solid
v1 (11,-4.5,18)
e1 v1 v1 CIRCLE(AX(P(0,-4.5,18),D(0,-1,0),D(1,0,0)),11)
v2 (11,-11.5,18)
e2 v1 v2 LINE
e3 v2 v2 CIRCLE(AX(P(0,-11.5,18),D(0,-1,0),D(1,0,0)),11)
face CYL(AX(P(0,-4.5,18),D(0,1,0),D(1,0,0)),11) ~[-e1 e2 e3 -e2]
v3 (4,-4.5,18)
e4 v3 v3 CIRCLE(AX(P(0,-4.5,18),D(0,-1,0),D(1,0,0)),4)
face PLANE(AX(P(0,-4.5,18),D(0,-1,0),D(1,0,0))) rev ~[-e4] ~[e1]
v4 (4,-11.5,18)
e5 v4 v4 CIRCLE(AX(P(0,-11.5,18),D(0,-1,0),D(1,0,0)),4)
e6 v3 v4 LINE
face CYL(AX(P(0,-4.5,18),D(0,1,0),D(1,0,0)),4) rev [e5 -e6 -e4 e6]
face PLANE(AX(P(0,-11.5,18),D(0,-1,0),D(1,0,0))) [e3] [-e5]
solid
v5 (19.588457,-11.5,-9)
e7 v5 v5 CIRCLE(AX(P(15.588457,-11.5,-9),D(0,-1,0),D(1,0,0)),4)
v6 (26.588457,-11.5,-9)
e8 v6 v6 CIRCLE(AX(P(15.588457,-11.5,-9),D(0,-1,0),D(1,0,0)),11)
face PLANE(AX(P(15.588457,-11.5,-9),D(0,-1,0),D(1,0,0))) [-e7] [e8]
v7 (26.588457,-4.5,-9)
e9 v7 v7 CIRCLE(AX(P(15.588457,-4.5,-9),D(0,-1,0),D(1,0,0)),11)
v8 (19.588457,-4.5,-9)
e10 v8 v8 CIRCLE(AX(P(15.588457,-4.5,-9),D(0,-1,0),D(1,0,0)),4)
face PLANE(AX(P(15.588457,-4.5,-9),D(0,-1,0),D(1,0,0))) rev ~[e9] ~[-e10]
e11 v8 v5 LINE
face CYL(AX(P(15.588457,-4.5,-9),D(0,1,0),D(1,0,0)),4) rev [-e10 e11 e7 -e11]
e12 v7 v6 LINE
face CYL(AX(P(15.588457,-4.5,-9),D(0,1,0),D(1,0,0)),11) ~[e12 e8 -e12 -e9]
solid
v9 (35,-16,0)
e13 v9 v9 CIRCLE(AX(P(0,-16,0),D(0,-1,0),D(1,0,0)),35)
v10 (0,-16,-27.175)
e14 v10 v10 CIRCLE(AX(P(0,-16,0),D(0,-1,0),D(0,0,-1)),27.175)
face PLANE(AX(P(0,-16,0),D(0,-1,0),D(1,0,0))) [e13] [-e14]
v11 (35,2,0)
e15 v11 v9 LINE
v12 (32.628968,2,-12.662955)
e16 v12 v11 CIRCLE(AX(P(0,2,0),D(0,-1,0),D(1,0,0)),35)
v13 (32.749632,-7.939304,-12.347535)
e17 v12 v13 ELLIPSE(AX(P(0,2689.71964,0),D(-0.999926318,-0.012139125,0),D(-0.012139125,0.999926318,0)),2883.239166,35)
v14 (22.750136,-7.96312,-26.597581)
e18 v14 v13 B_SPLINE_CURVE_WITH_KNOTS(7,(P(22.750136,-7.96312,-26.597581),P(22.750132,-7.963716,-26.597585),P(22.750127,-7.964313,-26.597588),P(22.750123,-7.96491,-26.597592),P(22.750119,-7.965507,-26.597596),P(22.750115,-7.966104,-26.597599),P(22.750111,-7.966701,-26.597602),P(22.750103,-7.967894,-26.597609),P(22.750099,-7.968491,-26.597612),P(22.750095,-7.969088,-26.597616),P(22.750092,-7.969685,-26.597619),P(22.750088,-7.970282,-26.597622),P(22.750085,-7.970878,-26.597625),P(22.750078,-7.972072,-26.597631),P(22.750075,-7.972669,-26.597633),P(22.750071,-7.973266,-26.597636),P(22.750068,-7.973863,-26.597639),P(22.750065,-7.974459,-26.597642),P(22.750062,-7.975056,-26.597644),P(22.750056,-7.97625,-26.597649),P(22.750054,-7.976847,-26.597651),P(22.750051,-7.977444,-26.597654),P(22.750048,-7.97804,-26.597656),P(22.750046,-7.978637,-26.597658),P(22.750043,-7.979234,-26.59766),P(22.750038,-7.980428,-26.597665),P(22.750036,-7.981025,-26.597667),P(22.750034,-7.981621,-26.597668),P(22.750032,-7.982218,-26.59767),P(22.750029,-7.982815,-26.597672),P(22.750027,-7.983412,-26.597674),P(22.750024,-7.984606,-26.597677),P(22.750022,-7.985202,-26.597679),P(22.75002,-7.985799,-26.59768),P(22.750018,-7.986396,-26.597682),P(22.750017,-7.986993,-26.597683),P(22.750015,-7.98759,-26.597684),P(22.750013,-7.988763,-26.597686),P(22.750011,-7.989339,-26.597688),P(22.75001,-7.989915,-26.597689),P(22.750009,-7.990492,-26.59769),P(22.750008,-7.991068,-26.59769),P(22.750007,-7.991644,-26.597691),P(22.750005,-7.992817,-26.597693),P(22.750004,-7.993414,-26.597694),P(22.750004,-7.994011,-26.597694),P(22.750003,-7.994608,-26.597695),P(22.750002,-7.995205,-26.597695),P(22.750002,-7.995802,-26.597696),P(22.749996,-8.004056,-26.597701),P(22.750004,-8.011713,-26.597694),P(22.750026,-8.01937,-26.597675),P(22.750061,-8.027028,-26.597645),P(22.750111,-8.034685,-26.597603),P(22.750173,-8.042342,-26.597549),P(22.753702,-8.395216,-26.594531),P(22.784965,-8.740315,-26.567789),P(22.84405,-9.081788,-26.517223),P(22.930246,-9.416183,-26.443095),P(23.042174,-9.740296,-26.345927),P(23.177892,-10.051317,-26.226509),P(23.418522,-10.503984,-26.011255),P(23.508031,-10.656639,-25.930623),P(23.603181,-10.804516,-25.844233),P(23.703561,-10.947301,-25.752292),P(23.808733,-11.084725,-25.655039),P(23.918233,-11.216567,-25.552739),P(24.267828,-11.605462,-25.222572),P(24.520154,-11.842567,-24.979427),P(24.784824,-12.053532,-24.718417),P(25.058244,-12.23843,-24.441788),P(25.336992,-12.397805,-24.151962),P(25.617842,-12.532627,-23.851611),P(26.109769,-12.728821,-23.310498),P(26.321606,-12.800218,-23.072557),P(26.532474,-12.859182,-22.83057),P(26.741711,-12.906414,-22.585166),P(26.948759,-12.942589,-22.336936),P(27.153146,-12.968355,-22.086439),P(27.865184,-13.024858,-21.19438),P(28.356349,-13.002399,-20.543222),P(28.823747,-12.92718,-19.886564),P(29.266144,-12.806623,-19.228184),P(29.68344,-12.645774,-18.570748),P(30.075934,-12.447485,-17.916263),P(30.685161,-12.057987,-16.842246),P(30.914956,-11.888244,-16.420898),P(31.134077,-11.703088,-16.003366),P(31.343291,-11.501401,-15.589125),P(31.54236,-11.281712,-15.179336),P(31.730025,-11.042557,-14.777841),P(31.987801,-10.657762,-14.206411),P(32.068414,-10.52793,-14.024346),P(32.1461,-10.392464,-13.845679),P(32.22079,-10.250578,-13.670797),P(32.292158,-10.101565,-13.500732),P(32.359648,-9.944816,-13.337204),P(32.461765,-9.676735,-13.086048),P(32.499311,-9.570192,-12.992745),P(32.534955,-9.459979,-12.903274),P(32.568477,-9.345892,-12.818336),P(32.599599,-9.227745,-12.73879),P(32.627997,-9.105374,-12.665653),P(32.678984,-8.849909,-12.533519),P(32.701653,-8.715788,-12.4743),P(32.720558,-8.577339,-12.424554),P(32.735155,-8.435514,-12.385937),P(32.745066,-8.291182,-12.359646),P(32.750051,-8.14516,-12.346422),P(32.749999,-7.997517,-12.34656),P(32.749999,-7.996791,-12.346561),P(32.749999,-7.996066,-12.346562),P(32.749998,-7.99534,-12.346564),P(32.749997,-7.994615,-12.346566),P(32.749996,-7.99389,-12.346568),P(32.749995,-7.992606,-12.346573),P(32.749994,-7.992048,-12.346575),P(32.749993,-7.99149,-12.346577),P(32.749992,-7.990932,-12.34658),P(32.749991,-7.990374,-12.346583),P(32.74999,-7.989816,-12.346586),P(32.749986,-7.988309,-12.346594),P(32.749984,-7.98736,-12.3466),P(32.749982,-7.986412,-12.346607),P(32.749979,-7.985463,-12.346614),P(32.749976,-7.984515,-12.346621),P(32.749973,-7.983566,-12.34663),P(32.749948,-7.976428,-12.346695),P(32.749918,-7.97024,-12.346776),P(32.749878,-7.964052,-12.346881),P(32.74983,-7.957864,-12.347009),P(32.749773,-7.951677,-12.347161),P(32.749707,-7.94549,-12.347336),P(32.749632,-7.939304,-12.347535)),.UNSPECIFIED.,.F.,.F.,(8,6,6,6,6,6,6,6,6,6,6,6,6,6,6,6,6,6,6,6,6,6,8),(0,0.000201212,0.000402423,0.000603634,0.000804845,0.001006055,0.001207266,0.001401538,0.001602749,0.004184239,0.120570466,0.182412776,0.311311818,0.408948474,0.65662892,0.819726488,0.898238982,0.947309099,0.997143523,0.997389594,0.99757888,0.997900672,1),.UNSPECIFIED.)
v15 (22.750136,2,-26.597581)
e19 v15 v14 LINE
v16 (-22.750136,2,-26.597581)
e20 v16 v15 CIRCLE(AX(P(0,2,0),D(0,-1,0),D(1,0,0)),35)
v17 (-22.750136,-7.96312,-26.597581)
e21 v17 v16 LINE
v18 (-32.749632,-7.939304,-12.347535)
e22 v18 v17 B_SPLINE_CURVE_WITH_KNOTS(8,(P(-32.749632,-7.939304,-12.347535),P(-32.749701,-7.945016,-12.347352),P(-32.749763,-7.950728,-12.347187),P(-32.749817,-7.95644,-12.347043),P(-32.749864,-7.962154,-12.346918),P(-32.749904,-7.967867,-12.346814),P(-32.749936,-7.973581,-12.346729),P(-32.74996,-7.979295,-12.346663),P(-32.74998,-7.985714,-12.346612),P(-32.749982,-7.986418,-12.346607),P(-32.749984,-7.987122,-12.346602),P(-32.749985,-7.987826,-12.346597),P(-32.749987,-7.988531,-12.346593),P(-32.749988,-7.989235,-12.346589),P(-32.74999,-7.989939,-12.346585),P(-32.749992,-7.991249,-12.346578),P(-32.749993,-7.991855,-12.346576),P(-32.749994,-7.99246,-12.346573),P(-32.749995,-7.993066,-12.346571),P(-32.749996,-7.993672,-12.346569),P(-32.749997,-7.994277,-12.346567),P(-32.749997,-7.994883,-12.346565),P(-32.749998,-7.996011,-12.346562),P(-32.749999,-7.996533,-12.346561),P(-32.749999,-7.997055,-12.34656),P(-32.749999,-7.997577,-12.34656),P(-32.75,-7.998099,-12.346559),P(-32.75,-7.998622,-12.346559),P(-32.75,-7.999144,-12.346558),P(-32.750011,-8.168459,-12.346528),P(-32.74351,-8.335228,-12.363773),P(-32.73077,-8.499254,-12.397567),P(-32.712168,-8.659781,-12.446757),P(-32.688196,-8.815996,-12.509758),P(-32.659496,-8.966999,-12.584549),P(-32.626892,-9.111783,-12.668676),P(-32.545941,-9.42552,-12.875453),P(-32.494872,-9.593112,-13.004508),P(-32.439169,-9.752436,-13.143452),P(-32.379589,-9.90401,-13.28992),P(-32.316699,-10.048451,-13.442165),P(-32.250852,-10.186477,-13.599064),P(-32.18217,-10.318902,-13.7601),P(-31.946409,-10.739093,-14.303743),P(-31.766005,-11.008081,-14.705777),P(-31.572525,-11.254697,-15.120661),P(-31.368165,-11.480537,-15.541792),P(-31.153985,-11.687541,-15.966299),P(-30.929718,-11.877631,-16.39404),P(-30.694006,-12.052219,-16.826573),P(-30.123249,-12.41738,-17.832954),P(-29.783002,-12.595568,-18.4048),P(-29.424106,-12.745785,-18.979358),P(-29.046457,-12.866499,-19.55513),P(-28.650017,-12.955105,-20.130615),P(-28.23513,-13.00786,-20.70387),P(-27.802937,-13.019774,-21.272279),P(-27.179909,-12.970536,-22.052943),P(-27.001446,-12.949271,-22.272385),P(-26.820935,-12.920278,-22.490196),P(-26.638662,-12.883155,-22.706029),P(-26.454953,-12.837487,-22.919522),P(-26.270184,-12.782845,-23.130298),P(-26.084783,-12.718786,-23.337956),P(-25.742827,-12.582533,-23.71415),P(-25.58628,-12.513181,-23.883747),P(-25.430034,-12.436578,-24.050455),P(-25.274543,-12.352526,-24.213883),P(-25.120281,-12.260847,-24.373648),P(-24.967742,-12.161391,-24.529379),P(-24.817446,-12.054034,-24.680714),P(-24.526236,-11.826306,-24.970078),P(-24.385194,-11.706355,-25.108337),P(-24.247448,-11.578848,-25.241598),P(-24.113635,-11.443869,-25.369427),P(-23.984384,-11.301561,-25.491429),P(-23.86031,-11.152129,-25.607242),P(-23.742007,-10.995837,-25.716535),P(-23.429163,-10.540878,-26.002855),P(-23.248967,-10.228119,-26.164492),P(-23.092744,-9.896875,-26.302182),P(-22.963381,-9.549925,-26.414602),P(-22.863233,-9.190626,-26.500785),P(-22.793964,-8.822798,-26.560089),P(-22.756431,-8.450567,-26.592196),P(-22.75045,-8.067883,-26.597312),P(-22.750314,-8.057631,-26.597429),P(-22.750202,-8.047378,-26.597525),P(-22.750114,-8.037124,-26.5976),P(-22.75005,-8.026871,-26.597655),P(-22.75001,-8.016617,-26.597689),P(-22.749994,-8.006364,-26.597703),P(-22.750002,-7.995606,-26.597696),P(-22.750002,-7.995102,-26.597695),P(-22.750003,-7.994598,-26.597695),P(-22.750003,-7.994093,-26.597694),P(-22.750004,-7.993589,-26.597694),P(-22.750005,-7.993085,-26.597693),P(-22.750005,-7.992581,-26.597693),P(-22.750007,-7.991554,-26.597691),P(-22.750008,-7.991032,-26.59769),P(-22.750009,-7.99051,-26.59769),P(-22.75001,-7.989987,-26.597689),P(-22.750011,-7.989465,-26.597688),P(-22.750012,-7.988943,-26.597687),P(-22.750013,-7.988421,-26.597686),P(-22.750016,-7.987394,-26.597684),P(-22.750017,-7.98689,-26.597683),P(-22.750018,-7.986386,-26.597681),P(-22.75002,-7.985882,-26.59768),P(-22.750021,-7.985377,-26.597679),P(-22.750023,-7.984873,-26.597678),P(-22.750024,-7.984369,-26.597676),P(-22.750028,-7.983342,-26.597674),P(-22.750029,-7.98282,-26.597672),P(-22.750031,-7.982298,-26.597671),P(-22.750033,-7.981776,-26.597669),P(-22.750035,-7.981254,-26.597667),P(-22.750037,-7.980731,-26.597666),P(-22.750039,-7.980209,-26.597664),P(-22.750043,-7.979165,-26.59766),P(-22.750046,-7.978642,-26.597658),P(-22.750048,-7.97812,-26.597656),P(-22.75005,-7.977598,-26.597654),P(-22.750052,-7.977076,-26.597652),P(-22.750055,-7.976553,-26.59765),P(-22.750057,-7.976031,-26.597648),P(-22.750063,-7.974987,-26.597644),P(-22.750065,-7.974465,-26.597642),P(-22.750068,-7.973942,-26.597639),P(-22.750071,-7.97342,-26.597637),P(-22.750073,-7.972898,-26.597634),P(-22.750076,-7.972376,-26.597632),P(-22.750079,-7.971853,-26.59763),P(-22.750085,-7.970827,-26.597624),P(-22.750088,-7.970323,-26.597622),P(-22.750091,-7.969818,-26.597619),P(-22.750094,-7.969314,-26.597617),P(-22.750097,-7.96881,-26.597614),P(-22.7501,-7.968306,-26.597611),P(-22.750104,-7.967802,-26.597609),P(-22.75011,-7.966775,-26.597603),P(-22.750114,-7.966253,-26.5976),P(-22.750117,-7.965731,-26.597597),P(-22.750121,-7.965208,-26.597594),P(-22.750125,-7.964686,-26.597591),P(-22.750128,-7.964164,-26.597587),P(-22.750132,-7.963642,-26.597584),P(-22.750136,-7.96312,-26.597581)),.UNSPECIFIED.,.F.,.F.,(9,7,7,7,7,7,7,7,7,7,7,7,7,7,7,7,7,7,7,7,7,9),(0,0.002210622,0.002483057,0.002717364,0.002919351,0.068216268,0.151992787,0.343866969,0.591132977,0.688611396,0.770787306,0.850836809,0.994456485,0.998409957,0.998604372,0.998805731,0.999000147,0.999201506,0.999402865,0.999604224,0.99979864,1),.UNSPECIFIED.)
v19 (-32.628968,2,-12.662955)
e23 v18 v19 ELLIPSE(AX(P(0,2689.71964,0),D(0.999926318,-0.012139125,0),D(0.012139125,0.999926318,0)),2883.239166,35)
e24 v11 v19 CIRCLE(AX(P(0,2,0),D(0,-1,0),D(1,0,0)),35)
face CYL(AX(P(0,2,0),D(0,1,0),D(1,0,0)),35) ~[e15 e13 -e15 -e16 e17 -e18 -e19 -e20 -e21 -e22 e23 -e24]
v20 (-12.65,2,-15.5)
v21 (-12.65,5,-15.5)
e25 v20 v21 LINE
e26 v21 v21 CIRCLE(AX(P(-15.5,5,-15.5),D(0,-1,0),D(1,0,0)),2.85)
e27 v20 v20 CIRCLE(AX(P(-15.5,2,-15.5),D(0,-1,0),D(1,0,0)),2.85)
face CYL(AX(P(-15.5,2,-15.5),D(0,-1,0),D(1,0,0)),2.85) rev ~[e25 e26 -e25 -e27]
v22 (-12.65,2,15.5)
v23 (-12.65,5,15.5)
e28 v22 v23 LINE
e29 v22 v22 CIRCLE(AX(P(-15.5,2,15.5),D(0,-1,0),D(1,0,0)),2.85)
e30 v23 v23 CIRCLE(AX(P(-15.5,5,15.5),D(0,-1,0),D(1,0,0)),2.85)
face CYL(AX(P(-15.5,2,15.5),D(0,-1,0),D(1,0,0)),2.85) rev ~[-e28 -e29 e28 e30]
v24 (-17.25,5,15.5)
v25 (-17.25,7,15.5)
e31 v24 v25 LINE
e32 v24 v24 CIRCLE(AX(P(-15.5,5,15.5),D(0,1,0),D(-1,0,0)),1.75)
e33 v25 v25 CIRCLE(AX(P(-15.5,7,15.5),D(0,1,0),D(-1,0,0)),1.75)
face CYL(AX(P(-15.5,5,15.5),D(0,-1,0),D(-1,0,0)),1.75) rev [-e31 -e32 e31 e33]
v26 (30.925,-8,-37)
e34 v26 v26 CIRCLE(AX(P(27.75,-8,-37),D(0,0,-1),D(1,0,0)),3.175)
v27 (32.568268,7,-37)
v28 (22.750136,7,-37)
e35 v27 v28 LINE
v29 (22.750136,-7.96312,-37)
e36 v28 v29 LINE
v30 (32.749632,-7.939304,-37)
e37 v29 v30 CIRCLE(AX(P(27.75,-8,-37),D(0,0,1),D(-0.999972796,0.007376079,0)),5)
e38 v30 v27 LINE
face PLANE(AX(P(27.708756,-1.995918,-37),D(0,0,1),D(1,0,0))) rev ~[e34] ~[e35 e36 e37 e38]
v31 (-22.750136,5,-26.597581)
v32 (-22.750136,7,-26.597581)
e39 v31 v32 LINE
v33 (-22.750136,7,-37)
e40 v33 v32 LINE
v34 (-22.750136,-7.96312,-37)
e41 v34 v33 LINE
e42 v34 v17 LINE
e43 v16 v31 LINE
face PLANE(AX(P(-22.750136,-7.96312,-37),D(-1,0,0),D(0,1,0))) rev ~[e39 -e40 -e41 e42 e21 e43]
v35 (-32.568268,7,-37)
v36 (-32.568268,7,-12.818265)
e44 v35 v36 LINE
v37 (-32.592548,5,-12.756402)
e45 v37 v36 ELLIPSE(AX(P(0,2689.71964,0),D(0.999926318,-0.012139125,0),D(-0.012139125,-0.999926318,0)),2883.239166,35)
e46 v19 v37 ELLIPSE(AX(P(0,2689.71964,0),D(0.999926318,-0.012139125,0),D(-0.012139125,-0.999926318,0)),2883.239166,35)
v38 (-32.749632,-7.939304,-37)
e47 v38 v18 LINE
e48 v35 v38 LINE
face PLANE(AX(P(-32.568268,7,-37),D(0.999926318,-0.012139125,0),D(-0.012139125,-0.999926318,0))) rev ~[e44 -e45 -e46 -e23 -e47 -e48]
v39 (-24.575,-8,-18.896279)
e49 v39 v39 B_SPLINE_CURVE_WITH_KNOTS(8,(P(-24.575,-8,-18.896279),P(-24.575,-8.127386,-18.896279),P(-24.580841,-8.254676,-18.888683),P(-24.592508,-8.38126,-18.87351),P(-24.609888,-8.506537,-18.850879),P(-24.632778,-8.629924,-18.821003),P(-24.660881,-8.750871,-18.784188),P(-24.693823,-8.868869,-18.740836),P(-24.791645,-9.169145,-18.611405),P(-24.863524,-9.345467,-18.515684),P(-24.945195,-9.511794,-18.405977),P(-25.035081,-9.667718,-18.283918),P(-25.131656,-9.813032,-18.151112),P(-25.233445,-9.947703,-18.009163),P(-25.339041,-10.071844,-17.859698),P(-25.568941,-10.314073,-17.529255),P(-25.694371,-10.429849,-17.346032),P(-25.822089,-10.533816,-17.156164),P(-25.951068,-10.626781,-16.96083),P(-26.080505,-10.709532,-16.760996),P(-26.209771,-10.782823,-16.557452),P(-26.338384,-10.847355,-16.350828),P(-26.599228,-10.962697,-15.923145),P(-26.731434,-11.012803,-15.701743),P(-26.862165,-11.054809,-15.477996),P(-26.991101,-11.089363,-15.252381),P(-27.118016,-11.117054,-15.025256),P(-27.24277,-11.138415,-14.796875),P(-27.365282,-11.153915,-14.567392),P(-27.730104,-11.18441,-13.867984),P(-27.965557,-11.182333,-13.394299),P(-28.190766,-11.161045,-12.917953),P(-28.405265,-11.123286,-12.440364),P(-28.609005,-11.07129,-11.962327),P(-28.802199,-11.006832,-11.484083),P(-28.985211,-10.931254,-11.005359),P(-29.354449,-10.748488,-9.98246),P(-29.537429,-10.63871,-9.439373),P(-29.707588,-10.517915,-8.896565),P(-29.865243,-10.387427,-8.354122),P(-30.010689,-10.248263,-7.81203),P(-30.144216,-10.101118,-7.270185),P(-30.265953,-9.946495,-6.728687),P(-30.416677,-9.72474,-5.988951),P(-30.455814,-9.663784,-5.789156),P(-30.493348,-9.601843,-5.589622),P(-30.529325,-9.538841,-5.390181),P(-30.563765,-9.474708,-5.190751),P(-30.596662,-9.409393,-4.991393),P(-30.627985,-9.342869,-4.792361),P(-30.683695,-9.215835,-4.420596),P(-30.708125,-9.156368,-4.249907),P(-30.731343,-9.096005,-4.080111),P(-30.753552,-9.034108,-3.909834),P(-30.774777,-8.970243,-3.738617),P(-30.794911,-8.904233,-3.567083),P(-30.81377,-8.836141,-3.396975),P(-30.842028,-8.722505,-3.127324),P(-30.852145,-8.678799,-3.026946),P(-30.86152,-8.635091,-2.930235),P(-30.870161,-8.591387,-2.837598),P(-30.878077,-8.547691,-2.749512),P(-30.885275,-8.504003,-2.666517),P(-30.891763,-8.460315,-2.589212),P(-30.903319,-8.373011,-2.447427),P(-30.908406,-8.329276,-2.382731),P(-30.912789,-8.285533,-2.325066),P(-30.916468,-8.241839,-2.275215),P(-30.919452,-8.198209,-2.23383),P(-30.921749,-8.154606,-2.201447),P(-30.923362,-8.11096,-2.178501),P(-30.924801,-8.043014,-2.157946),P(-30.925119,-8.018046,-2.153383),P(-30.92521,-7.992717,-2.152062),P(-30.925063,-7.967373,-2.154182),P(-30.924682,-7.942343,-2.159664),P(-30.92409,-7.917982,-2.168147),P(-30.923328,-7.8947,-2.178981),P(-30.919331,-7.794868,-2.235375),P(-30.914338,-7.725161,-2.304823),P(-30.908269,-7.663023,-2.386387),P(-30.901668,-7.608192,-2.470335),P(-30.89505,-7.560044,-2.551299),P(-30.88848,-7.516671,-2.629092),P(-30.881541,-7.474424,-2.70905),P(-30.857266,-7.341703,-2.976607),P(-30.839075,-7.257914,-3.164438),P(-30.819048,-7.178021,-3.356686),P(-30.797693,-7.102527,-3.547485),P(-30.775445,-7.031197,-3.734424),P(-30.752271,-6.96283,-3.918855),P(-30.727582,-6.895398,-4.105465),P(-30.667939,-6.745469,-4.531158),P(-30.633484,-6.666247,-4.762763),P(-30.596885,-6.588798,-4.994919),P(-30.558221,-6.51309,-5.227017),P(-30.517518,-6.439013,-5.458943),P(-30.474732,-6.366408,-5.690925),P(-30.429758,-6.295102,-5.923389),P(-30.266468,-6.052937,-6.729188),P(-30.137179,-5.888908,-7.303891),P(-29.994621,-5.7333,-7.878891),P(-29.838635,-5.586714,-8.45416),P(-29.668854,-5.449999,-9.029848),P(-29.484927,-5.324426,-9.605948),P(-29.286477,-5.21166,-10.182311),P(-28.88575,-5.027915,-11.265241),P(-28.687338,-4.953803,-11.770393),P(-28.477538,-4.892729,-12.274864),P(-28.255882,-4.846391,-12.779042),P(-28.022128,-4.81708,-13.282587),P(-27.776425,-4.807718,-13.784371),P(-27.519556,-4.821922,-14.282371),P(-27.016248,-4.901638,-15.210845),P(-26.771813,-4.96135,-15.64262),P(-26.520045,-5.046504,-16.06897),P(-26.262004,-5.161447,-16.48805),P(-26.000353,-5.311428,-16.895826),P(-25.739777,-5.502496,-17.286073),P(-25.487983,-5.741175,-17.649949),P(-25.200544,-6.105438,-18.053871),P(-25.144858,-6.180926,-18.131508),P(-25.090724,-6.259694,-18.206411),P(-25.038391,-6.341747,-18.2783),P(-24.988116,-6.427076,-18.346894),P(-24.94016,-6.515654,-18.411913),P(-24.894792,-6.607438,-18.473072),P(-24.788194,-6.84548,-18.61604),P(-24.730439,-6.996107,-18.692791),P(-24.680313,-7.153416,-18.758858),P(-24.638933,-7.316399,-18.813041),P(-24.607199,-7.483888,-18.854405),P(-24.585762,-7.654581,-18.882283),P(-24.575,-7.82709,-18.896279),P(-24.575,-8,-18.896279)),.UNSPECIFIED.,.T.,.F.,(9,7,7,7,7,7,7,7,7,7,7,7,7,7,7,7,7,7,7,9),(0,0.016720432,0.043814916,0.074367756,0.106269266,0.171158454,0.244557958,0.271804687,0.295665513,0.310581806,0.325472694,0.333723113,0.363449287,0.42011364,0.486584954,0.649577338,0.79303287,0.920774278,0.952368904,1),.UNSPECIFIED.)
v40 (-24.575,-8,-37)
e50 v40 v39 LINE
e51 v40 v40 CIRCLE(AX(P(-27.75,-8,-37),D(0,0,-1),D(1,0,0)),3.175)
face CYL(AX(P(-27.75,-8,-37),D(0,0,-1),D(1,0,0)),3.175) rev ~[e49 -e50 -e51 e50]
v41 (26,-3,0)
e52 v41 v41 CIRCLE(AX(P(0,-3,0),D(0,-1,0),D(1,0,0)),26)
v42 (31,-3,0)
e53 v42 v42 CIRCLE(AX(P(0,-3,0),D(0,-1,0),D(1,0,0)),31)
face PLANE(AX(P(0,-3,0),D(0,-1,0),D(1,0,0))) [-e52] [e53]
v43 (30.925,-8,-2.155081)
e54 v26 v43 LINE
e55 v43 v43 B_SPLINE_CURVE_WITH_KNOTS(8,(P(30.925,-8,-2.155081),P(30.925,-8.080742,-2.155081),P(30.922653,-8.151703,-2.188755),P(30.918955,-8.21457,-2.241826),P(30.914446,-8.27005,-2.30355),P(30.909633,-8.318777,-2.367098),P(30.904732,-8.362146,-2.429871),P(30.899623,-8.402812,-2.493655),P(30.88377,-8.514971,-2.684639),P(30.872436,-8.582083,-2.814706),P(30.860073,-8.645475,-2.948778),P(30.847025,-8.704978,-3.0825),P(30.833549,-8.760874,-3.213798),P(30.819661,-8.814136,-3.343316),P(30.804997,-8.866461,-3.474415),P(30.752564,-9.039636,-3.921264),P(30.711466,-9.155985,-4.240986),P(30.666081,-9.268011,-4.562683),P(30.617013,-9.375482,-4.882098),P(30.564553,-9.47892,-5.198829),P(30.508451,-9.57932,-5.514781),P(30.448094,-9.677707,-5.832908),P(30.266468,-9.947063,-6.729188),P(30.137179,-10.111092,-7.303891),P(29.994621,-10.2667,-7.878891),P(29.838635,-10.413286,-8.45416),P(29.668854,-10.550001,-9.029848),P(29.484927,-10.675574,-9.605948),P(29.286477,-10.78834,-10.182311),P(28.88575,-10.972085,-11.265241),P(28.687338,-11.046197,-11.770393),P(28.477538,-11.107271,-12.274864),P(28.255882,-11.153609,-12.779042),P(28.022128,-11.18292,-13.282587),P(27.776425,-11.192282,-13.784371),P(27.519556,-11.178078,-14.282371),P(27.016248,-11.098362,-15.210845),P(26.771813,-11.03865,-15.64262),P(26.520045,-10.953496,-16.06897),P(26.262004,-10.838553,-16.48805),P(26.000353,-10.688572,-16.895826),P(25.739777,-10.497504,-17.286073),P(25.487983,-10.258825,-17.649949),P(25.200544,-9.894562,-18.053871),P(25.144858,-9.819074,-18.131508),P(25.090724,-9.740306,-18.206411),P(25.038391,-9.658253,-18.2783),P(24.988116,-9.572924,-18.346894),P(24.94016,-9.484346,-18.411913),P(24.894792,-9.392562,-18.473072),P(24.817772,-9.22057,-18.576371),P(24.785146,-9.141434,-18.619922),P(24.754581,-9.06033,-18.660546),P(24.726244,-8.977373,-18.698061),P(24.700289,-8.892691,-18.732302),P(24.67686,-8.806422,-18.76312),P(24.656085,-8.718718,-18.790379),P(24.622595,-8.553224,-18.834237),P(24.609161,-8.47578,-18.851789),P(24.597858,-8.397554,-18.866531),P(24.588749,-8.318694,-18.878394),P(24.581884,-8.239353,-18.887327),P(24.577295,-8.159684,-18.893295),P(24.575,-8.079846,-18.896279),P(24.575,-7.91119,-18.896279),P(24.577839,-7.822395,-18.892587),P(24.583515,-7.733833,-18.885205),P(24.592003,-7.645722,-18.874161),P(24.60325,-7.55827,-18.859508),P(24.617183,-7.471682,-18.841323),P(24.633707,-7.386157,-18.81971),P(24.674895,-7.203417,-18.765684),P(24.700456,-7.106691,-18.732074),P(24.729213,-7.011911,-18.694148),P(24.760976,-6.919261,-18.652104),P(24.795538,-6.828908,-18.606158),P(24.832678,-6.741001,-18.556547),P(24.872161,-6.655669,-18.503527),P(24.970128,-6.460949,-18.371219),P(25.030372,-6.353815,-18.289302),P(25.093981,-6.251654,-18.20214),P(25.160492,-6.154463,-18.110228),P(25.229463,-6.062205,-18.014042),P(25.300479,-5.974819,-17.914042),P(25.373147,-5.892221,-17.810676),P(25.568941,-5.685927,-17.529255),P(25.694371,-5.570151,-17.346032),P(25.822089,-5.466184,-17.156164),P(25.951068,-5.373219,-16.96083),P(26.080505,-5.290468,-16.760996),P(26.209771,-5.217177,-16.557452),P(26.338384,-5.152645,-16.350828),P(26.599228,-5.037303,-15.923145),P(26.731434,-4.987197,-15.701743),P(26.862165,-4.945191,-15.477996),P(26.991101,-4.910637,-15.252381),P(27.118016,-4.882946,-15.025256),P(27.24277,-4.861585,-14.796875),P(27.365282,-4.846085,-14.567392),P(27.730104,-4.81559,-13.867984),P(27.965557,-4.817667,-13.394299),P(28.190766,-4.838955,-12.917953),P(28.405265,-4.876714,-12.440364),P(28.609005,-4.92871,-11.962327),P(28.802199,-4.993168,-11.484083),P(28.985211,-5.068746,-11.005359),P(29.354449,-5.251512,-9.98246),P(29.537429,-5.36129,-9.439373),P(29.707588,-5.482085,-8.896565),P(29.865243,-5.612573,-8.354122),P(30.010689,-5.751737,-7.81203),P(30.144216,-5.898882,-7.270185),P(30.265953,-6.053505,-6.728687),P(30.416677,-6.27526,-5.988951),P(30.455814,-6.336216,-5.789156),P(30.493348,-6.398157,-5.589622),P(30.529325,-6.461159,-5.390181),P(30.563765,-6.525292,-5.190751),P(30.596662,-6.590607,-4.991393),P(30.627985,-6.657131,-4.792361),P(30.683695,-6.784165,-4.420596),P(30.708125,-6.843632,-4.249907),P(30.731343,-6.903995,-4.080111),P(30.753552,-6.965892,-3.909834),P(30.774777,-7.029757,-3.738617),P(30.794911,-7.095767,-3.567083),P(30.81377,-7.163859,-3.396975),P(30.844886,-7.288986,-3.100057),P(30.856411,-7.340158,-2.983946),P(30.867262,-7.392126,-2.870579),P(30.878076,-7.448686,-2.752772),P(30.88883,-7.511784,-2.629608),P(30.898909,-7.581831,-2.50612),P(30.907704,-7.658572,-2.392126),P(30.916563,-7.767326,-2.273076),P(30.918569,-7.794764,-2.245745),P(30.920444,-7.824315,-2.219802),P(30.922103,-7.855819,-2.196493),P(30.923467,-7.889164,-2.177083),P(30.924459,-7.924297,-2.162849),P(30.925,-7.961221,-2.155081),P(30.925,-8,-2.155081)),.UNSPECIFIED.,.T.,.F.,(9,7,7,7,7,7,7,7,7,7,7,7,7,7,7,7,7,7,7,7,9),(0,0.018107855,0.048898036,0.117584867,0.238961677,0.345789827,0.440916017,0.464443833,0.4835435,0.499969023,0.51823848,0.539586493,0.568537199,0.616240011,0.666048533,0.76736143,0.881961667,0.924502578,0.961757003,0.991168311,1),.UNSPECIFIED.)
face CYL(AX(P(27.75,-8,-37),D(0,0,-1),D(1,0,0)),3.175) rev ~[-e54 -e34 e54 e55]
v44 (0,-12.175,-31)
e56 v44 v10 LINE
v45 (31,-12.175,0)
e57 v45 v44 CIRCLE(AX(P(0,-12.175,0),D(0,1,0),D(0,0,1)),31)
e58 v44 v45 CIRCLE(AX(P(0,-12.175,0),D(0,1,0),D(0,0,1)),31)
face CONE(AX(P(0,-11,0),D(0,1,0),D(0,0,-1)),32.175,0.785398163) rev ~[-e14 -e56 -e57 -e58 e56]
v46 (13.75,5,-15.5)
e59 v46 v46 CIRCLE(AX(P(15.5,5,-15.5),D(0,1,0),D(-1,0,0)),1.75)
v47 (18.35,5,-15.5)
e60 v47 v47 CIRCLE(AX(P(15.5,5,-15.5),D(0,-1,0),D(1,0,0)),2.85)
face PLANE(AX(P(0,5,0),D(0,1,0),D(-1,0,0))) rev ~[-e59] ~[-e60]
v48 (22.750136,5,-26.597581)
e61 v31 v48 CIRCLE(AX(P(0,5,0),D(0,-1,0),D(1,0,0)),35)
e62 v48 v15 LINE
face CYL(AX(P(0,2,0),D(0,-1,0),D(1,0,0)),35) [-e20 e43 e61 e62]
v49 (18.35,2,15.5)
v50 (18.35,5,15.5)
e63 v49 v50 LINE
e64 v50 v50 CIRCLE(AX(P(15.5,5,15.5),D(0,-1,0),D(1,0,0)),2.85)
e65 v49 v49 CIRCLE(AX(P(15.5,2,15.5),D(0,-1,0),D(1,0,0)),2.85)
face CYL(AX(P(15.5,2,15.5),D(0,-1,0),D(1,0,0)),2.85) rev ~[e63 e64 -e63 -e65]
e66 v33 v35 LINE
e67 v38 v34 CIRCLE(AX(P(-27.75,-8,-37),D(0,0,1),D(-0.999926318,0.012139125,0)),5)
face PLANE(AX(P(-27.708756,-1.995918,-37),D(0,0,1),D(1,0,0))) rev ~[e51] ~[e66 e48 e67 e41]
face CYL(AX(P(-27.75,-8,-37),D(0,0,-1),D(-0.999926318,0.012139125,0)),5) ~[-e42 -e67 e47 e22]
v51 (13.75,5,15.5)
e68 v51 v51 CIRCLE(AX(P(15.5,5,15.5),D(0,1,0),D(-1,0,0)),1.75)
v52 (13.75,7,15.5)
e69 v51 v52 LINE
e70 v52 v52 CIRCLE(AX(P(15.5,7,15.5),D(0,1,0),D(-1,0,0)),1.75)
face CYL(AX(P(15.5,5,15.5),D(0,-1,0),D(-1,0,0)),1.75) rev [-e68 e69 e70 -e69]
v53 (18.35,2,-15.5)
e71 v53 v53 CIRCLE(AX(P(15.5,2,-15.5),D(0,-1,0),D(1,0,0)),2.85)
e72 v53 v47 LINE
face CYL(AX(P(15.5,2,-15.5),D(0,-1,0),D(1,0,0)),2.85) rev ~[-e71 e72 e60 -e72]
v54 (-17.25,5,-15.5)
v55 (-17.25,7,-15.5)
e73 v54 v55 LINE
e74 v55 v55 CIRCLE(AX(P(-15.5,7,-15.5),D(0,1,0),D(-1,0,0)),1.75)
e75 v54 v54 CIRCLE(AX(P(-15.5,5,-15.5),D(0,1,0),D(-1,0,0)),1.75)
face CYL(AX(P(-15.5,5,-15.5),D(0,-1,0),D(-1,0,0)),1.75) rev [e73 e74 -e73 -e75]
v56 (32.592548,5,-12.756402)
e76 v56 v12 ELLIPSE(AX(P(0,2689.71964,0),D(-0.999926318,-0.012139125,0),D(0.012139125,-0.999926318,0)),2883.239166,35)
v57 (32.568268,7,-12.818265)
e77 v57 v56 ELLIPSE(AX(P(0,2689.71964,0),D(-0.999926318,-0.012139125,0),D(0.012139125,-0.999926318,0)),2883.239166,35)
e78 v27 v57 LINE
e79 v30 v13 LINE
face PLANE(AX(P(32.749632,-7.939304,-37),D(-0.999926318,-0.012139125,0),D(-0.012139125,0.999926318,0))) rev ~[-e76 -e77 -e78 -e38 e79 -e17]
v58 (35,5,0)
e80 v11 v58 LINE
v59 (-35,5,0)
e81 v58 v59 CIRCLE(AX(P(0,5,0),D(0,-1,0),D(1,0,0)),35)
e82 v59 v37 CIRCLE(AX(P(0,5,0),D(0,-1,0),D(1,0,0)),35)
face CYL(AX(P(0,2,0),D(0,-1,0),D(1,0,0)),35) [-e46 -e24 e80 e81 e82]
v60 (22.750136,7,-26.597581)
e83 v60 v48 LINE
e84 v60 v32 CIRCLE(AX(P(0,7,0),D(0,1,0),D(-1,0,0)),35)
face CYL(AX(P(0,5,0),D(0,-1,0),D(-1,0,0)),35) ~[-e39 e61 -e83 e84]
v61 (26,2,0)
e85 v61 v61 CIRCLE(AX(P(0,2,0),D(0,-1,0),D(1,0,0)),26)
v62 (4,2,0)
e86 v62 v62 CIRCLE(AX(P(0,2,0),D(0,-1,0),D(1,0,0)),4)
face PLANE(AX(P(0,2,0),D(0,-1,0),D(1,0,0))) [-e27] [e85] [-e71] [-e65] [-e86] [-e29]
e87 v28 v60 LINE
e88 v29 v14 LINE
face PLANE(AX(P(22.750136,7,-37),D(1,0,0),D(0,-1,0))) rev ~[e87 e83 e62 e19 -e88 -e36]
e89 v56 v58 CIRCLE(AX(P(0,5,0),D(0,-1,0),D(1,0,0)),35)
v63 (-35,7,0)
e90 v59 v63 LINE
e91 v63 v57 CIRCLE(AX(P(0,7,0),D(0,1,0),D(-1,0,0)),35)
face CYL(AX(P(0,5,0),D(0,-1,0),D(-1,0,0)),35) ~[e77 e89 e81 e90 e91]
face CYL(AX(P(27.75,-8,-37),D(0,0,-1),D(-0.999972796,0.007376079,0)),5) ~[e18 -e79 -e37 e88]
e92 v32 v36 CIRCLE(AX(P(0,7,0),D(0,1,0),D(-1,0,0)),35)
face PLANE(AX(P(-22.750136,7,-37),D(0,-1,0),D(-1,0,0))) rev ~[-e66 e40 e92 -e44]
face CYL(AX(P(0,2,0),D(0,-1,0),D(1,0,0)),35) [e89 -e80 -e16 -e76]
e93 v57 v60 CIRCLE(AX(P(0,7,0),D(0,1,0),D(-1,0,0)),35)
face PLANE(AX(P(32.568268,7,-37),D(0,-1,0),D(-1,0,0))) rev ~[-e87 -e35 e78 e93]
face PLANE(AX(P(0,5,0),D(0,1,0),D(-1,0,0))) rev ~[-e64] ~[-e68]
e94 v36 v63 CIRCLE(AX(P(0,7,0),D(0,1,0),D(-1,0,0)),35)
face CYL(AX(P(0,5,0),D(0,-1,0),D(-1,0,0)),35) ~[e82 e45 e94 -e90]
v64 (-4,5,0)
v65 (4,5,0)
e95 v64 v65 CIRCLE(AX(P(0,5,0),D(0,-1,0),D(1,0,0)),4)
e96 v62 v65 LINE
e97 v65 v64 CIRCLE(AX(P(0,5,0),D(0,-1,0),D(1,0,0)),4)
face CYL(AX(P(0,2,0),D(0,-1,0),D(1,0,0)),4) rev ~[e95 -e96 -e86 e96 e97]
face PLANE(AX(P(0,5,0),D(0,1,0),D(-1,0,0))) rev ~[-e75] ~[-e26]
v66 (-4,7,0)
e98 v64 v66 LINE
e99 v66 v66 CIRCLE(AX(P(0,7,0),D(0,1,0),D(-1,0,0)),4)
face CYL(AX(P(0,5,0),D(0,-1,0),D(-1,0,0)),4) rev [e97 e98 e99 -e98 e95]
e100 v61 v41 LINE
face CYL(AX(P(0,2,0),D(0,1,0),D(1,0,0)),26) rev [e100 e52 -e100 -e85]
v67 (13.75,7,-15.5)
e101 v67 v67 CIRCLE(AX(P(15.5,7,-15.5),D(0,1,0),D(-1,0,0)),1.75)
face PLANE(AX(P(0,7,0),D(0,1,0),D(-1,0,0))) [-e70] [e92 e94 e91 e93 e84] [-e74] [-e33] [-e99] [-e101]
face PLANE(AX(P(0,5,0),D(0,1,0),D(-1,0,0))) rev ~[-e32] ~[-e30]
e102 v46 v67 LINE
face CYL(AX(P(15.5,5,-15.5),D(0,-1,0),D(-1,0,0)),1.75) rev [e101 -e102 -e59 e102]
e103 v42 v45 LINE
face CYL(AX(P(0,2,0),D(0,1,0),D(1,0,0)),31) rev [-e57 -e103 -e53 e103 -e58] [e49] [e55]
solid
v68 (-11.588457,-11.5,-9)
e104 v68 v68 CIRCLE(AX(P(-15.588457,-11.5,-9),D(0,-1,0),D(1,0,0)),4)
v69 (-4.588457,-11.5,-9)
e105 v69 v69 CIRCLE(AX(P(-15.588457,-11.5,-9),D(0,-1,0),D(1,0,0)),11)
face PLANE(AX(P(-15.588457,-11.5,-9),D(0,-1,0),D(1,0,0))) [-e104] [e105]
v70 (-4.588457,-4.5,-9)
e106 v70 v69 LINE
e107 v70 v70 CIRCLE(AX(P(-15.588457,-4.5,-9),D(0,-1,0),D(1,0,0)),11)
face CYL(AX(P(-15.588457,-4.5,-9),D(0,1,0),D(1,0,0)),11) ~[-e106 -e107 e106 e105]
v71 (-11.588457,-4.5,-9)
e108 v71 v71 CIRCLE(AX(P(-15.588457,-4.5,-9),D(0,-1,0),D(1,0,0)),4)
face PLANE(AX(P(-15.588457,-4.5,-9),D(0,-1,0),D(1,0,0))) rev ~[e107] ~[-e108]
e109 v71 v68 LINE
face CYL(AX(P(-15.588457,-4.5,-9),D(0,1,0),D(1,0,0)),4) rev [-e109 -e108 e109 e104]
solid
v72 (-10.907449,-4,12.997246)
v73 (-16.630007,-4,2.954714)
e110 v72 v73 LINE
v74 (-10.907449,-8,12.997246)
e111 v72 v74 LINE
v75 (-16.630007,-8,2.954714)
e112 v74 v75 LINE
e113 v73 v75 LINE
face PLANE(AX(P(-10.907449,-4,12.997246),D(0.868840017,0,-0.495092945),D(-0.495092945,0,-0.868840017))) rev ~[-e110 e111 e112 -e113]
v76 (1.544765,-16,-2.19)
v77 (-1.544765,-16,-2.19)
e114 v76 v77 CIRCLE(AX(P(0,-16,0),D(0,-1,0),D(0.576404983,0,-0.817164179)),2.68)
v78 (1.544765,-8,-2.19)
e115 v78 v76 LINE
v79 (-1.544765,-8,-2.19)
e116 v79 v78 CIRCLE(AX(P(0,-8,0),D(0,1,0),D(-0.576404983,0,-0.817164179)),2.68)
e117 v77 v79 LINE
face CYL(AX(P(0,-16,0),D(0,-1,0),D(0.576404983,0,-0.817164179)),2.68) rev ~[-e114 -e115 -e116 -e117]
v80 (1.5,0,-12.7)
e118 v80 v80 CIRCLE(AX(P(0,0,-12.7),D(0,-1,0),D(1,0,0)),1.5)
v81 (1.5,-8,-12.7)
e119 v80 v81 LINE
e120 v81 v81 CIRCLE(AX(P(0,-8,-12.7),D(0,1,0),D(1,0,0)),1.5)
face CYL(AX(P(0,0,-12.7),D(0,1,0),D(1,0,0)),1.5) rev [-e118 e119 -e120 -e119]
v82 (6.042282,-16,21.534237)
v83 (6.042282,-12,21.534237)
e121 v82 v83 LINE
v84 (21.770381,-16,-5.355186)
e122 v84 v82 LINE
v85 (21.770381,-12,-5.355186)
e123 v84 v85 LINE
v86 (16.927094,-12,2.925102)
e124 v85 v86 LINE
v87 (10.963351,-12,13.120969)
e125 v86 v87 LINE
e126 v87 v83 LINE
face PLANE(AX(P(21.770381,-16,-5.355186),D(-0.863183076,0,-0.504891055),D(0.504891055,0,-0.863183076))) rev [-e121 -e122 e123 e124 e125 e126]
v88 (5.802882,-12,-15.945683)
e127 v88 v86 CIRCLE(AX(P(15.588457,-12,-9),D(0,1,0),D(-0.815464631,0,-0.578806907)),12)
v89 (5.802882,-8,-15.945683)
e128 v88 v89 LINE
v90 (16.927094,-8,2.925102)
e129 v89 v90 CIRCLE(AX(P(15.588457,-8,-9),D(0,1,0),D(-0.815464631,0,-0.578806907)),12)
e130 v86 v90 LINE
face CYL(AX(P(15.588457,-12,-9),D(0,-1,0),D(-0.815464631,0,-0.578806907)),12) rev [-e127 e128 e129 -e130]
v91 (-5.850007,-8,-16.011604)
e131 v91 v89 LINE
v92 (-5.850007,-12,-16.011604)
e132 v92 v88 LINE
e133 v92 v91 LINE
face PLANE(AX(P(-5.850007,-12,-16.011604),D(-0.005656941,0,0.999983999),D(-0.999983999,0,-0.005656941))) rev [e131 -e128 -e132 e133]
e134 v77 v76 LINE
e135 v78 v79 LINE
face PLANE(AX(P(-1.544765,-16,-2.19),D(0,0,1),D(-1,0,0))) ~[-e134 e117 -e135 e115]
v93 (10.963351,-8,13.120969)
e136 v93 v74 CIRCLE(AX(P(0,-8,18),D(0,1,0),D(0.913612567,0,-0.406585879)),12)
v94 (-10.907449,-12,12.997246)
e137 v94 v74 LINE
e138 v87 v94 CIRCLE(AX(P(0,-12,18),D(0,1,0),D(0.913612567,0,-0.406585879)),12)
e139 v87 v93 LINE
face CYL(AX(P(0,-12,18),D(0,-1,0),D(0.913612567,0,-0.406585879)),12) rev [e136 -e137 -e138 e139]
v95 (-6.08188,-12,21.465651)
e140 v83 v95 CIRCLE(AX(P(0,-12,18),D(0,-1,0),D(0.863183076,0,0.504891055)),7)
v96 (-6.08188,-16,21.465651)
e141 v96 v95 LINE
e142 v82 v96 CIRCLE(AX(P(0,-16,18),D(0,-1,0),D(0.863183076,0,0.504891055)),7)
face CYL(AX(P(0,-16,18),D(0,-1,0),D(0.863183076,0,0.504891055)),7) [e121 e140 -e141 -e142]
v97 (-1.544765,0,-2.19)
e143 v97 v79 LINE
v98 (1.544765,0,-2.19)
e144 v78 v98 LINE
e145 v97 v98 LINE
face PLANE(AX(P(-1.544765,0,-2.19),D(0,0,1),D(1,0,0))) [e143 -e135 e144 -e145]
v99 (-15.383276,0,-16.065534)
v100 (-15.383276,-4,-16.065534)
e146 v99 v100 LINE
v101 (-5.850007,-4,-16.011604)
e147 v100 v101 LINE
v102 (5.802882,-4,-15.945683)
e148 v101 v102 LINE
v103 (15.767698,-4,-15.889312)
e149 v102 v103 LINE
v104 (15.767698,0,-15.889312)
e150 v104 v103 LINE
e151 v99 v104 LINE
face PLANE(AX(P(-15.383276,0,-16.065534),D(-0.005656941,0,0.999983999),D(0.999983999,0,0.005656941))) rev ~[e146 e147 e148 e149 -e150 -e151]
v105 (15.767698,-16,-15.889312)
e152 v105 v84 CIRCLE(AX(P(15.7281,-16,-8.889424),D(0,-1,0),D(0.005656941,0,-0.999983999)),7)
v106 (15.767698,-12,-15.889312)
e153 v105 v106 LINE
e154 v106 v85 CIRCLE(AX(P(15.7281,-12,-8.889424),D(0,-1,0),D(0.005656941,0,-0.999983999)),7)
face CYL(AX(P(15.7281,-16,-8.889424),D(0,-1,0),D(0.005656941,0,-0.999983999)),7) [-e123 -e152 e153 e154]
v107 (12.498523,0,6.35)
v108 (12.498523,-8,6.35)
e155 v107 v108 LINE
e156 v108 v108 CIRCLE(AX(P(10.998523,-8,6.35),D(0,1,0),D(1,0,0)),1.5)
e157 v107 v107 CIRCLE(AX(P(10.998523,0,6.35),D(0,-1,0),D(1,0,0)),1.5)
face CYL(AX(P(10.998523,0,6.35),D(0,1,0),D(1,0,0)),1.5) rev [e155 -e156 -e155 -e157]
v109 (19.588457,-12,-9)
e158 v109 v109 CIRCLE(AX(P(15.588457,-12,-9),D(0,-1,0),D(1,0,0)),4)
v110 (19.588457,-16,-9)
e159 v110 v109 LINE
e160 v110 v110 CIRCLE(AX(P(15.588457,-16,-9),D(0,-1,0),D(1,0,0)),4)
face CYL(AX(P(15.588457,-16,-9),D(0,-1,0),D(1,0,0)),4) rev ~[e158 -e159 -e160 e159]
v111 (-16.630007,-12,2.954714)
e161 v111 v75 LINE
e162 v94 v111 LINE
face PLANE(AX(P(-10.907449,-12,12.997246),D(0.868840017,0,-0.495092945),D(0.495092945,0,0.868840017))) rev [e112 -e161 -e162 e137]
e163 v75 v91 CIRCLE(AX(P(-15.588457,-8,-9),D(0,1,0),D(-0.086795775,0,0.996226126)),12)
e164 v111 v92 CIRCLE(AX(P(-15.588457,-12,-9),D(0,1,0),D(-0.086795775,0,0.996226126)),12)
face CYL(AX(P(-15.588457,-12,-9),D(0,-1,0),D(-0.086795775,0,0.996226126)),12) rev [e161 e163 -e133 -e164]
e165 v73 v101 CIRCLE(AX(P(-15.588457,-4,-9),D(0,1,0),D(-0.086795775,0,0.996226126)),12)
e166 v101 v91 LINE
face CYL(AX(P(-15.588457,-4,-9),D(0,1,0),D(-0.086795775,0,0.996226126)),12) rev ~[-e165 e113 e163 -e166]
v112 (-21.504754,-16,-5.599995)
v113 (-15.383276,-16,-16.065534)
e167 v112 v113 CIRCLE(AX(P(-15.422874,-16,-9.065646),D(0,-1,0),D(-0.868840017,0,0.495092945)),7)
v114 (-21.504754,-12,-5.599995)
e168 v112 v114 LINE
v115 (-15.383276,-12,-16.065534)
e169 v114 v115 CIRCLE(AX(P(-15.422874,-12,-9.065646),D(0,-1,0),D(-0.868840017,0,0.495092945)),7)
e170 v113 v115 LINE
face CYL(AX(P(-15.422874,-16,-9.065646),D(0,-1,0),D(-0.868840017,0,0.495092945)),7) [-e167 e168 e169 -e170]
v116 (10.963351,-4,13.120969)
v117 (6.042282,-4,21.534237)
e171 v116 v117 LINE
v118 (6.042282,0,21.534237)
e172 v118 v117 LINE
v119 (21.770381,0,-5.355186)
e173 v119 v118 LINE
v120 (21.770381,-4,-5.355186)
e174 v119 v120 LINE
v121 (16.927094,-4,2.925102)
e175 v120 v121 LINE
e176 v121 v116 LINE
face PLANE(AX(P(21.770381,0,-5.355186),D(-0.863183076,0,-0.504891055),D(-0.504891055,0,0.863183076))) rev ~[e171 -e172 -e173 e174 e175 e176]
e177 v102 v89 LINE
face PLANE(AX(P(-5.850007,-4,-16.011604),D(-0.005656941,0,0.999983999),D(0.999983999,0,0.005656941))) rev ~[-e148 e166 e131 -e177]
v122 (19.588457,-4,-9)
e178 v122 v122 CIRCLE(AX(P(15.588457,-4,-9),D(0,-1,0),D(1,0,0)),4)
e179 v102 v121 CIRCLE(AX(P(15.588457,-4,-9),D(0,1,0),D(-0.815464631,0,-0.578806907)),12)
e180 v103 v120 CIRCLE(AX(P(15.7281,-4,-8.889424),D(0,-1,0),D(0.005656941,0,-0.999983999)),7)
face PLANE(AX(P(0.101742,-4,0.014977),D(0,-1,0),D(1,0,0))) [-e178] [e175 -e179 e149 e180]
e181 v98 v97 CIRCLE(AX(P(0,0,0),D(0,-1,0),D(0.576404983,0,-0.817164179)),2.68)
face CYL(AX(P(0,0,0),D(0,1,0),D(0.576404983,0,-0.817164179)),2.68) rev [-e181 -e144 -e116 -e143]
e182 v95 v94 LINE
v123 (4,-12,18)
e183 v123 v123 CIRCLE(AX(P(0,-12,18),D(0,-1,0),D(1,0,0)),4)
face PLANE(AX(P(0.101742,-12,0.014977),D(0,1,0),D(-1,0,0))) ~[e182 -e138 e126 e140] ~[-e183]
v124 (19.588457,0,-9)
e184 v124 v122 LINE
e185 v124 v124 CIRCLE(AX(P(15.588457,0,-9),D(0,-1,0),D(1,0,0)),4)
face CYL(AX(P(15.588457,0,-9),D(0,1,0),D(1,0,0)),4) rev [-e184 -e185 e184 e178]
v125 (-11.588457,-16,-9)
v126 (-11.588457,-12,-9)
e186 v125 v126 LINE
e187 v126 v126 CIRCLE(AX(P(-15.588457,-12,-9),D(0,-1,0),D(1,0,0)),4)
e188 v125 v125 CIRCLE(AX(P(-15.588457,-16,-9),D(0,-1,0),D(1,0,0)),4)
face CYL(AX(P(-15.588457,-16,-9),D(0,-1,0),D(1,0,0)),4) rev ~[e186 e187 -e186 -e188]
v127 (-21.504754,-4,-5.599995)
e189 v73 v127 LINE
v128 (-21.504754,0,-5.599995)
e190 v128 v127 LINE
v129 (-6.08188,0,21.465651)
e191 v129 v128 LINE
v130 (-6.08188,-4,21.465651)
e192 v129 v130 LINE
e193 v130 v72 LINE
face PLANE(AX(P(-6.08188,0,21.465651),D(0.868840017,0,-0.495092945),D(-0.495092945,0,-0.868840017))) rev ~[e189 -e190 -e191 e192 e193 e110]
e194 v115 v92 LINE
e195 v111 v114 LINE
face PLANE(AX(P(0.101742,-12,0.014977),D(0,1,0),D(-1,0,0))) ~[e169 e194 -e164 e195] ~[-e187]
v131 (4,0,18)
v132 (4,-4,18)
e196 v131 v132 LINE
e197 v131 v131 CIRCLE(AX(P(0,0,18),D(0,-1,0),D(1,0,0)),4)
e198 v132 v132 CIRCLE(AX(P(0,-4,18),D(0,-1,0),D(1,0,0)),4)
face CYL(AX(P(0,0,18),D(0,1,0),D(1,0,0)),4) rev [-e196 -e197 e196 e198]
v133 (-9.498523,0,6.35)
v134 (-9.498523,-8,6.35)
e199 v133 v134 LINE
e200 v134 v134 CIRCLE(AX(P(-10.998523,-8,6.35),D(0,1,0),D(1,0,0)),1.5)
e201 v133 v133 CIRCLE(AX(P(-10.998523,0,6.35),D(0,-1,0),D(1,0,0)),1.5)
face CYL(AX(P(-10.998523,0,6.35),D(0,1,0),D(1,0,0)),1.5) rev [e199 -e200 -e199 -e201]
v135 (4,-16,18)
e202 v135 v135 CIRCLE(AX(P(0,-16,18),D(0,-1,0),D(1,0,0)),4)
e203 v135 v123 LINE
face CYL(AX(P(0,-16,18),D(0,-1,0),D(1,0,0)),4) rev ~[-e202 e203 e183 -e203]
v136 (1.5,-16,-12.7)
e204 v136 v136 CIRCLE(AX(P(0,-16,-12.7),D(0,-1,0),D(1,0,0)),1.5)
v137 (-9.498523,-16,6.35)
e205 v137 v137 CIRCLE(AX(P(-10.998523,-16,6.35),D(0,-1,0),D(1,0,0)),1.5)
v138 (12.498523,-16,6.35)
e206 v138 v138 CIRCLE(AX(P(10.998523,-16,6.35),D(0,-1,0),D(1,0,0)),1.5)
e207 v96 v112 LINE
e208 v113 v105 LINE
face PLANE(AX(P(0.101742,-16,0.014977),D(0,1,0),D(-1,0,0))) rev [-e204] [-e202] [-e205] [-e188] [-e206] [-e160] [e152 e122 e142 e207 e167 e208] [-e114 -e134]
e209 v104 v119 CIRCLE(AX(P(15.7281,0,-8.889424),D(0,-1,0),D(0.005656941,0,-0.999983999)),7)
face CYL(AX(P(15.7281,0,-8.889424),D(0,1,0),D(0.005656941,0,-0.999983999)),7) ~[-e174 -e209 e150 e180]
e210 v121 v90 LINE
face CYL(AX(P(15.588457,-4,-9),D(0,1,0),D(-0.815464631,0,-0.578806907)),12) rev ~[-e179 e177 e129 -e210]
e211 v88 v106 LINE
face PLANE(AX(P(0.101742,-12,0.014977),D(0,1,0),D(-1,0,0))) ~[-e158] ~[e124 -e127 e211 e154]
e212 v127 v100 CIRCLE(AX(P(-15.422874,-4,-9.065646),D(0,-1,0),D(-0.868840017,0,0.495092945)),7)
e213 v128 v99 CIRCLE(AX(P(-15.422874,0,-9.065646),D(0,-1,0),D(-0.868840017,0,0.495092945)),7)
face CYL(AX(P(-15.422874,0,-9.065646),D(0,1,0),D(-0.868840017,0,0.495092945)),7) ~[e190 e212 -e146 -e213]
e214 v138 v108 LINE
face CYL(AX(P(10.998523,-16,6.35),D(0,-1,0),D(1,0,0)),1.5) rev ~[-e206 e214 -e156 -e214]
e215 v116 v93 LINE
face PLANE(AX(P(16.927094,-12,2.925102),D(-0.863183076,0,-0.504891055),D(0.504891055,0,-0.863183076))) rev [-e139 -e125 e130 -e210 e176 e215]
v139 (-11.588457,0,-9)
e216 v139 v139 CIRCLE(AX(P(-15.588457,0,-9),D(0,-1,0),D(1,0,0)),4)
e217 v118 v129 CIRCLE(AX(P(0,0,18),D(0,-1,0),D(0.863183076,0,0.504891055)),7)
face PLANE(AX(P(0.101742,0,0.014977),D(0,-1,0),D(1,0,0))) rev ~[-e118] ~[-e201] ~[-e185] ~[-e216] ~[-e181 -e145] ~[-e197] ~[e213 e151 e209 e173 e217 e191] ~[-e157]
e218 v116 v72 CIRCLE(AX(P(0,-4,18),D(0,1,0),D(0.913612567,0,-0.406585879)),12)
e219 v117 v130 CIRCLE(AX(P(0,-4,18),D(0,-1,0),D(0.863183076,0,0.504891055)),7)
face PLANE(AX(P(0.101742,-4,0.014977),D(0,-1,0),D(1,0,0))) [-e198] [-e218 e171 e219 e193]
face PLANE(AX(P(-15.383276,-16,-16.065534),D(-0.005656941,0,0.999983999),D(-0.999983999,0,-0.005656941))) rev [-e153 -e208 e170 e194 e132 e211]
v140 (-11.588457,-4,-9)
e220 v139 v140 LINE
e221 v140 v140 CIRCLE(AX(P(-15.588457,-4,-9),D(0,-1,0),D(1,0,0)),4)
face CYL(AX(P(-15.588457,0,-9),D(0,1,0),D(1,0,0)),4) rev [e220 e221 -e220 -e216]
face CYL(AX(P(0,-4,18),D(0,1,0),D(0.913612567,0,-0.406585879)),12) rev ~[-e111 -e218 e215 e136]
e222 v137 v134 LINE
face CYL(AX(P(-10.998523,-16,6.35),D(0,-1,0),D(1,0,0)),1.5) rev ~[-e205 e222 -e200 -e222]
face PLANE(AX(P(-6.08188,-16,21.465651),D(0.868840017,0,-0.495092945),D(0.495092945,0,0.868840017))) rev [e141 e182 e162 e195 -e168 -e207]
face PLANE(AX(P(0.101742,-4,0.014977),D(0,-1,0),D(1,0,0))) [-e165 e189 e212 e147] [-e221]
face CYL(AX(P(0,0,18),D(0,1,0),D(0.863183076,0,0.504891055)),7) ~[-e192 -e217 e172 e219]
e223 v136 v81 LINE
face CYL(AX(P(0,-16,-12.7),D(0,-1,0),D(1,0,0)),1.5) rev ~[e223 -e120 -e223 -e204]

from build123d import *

# Parameters (mm, degrees)
F0_R      = 4
F1_DEPTH  = 4
F3_DEPTH  = 4
F4_R      = 1.5
F5_DEPTH  = 25.4
F7_R      = 35
F7_R_2    = 2.85
F7_R_3    = 4
F8_DEPTH  = 3
F9_R      = 35
F9_R_2    = 1.75
F9_R_3    = 4
F10_DEPTH = 2
F12_R     = 11
F12_R_2   = 4
F13_DEPTH = 7
F15_R     = 35
F15_R_2   = 31
F16_DEPTH = 18
F22_R     = 3.175
F23_DEPTH = 37
F24_R     = 31
F24_R_2   = 26
F25_DEPTH = 5


# Not quite as in the source:
# - after a boolean that leaves OpenCascade's solid faulty, fix() repairs it


with BuildPart() as f1:
    # F0 (on Front) → F1 (new body)
    with BuildSketch(Plane.XZ):
        with BuildLine():
            Line((21.7703811819, -5.3551862172), (6.0422815334, 21.5342373819))
            ThreePointArc((6.0422815334, 21.5342373819), (-0.039598589, 24.9998879957), (-6.0818801224, 21.4656506138))
            Line((-6.0818801224, 21.4656506138), (-21.504754228, -5.5999950346))
            ThreePointArc((-21.504754228, -5.5999950346), (-21.465155639, -12.5998830303), (-15.3832755166, -16.0655336441))
            Line((-15.3832755166, -16.0655336441), (15.7676982376, -15.8893115947))
            ThreePointArc((15.7676982376, -15.8893115947), (21.8099797709, -12.3550742128), (21.7703811819, -5.3551862172))
        make_face()
        with Locations((-15.5884572681, -9)):
            Circle(F0_R, mode=Mode.SUBTRACT)
        with Locations((15.5884572681, -9)):
            Circle(F0_R, mode=Mode.SUBTRACT)
        with Locations((0, 18)):
            Circle(F0_R, mode=Mode.SUBTRACT)
    extrude(amount=F1_DEPTH)

    # F2 (on face) → F3 (join)
    with BuildSketch(Plane.XZ.offset(4)):
        with BuildLine():
            ThreePointArc((-16.6300065653, 2.9547135081), (-5.1558488531, -3.0703556887), (-5.8500069609, -16.0116036406))
            Line((-5.8500069609, -16.0116036406), (5.8028816925, -15.9456828789))
            ThreePointArc((5.8028816925, -15.9456828789), (5.2509372213, -2.906094907), (16.9270942552, 2.9251017194))
            Line((16.9270942552, 2.9251017194), (10.9633508087, 13.1209694563))
            ThreePointArc((10.9633508087, 13.1209694563), (0.0678832955, 6.0001920074), (-10.9074492372, 12.9972456448))
            Line((-10.9074492372, 12.9972456448), (-16.6300065653, 2.9547135081))
        make_face()
        with BuildLine():
            ThreePointArc((-1.5447653543, -2.19), (0, 2.68), (1.5447653543, -2.19))
            Line((1.5447653543, -2.19), (-1.5447653543, -2.19))
        make_face(mode=Mode.SUBTRACT)
    extrude(amount=F3_DEPTH)

    # F4 (on Front) → F5 (cut)
    with BuildSketch(Plane.XZ):
        with Locations((0, -12.7)):
            Circle(F4_R)
        with Locations((10.9985226281, 6.35)):
            Circle(F4_R)
        with Locations((-10.9985226281, 6.35)):
            Circle(F4_R)
        with BuildLine():
            Line((-1.5447653543, -2.19), (1.5447653543, -2.19))
            ThreePointArc((1.5447653543, -2.19), (0, 2.68), (-1.5447653543, -2.19))
        make_face()
    extrude(amount=F5_DEPTH, mode=Mode.SUBTRACT)

    # F14: F1 across face


with BuildPart() as f8:
    # F7 (on offset) → F8 (new body)
    with BuildSketch(Plane.XZ.offset(-2)):
        Circle(F7_R)
        with Locations((-15.5, -15.5)):
            Circle(F7_R_2, mode=Mode.SUBTRACT)
        with Locations((15.5, -15.5)):
            Circle(F7_R_2, mode=Mode.SUBTRACT)
        with Locations((-15.5, 15.5)):
            Circle(F7_R_2, mode=Mode.SUBTRACT)
        Circle(F7_R_3, mode=Mode.SUBTRACT)
        with Locations((15.5, 15.5)):
            Circle(F7_R_2, mode=Mode.SUBTRACT)
    extrude(amount=-F8_DEPTH)

    # F9 (on face) → F10 (join)
    with BuildSketch(Plane(origin=(0, 5, 0), x_dir=(-1, 0, 0), z_dir=(0, 1, 0))):
        Circle(F9_R)
        with Locations((-15.5, -15.5)):
            Circle(F9_R_2, mode=Mode.SUBTRACT)
        with Locations((15.5, -15.5)):
            Circle(F9_R_2, mode=Mode.SUBTRACT)
        with Locations((-15.5, 15.5)):
            Circle(F9_R_2, mode=Mode.SUBTRACT)
        Circle(F9_R_3, mode=Mode.SUBTRACT)
        with Locations((15.5, 15.5)):
            Circle(F9_R_2, mode=Mode.SUBTRACT)
    extrude(amount=F10_DEPTH)

    # F15 (on face) → F16 (join)
    with BuildSketch(Plane.XZ.offset(-2)):
        Circle(F15_R)
        Circle(F15_R_2, mode=Mode.SUBTRACT)
    extrude(amount=F16_DEPTH)

    add(f8.part.fix(), mode=Mode.REPLACE)

    # F17 (on Right) → F18 (revolve)
    with BuildSketch(Plane.YZ):
        Polygon((-16, -32.175), (-11, -32.175), (-16, -27.175), align=None)
    revolve(axis=Axis((0, -8.0179562792, 0), (0, -1, 0)))

    # F20 (on offset) → F21 (join, up to the next surface of F8)
    with BuildSketch(Plane.XY.offset(-37)):
        with BuildLine():
            Line((-32.5682681475, 7), (-32.7496315906, -7.9393043761))
            ThreePointArc((-32.7496315906, -7.9393043761), (-27.7619081825, -12.9999858195), (-22.7501360182, -7.9631196072))
            Line((-22.7501360182, -7.9631196072), (-22.7501360182, 7))
            Line((-22.7501360182, 7), (-32.5682681475, 7))
        make_face()
        with BuildLine():
            ThreePointArc((22.7501360182, -7.9631196072), (27.7619081825, -12.9999858195), (32.7496315906, -7.9393043761))
            Line((32.7496315906, -7.9393043761), (32.5682681475, 7))
            Line((32.5682681475, 7), (22.7501360182, 7))
            Line((22.7501360182, 7), (22.7501360182, -7.9631196072))
        make_face()
    extrude(until=Until.NEXT)

    # F22 (on face) → F23 (cut)
    with BuildSketch(Plane(origin=(0, 0, -37), x_dir=(1, 0, 0), z_dir=(0, 0, -1))):
        with Locations((27.75, 8)):
            Circle(F22_R)
        with Locations((-27.75, 8)):
            Circle(F22_R)
    extrude(amount=-F23_DEPTH, mode=Mode.SUBTRACT)

    # F24 (on face) → F25 (join)
    with BuildSketch(Plane.XZ.offset(-2)):
        Circle(F24_R)
        Circle(F24_R_2, mode=Mode.SUBTRACT)
    extrude(amount=F25_DEPTH)


with BuildPart() as f13:
    # F12 (on offset) → F13 (new body)
    with BuildSketch(Plane.XZ.offset(4.5)):
        with Locations((0, 18)):
            Circle(F12_R)
        with Locations((0, 18)):
            Circle(F12_R_2, mode=Mode.SUBTRACT)
    extrude(amount=F13_DEPTH)


with BuildPart() as f13b:
    # F12 (on offset) → F13, piece 2 (new body)
    with BuildSketch(Plane.XZ.offset(4.5)):
        with Locations((-15.5884572681, -9)):
            Circle(F12_R)
        with Locations((-15.5884572681, -9)):
            Circle(F12_R_2, mode=Mode.SUBTRACT)
    extrude(amount=F13_DEPTH)


with BuildPart() as f13c:
    # F12 (on offset) → F13, piece 3 (new body)
    with BuildSketch(Plane.XZ.offset(4.5)):
        with Locations((15.5884572681, -9)):
            Circle(F12_R)
        with Locations((15.5884572681, -9)):
            Circle(F12_R_2, mode=Mode.SUBTRACT)
    extrude(amount=F13_DEPTH)


with BuildPart() as f1_1:
    add(f1.part)
    add(f1.part.mirror(Plane(origin=(0.0858513894, -8, 0.0050053506), x_dir=(1, 0, 0), z_dir=(0, -1, 0))))


solid = Compound([f8.part, f13.part, f13b.part, f13c.part, f1_1.part])
